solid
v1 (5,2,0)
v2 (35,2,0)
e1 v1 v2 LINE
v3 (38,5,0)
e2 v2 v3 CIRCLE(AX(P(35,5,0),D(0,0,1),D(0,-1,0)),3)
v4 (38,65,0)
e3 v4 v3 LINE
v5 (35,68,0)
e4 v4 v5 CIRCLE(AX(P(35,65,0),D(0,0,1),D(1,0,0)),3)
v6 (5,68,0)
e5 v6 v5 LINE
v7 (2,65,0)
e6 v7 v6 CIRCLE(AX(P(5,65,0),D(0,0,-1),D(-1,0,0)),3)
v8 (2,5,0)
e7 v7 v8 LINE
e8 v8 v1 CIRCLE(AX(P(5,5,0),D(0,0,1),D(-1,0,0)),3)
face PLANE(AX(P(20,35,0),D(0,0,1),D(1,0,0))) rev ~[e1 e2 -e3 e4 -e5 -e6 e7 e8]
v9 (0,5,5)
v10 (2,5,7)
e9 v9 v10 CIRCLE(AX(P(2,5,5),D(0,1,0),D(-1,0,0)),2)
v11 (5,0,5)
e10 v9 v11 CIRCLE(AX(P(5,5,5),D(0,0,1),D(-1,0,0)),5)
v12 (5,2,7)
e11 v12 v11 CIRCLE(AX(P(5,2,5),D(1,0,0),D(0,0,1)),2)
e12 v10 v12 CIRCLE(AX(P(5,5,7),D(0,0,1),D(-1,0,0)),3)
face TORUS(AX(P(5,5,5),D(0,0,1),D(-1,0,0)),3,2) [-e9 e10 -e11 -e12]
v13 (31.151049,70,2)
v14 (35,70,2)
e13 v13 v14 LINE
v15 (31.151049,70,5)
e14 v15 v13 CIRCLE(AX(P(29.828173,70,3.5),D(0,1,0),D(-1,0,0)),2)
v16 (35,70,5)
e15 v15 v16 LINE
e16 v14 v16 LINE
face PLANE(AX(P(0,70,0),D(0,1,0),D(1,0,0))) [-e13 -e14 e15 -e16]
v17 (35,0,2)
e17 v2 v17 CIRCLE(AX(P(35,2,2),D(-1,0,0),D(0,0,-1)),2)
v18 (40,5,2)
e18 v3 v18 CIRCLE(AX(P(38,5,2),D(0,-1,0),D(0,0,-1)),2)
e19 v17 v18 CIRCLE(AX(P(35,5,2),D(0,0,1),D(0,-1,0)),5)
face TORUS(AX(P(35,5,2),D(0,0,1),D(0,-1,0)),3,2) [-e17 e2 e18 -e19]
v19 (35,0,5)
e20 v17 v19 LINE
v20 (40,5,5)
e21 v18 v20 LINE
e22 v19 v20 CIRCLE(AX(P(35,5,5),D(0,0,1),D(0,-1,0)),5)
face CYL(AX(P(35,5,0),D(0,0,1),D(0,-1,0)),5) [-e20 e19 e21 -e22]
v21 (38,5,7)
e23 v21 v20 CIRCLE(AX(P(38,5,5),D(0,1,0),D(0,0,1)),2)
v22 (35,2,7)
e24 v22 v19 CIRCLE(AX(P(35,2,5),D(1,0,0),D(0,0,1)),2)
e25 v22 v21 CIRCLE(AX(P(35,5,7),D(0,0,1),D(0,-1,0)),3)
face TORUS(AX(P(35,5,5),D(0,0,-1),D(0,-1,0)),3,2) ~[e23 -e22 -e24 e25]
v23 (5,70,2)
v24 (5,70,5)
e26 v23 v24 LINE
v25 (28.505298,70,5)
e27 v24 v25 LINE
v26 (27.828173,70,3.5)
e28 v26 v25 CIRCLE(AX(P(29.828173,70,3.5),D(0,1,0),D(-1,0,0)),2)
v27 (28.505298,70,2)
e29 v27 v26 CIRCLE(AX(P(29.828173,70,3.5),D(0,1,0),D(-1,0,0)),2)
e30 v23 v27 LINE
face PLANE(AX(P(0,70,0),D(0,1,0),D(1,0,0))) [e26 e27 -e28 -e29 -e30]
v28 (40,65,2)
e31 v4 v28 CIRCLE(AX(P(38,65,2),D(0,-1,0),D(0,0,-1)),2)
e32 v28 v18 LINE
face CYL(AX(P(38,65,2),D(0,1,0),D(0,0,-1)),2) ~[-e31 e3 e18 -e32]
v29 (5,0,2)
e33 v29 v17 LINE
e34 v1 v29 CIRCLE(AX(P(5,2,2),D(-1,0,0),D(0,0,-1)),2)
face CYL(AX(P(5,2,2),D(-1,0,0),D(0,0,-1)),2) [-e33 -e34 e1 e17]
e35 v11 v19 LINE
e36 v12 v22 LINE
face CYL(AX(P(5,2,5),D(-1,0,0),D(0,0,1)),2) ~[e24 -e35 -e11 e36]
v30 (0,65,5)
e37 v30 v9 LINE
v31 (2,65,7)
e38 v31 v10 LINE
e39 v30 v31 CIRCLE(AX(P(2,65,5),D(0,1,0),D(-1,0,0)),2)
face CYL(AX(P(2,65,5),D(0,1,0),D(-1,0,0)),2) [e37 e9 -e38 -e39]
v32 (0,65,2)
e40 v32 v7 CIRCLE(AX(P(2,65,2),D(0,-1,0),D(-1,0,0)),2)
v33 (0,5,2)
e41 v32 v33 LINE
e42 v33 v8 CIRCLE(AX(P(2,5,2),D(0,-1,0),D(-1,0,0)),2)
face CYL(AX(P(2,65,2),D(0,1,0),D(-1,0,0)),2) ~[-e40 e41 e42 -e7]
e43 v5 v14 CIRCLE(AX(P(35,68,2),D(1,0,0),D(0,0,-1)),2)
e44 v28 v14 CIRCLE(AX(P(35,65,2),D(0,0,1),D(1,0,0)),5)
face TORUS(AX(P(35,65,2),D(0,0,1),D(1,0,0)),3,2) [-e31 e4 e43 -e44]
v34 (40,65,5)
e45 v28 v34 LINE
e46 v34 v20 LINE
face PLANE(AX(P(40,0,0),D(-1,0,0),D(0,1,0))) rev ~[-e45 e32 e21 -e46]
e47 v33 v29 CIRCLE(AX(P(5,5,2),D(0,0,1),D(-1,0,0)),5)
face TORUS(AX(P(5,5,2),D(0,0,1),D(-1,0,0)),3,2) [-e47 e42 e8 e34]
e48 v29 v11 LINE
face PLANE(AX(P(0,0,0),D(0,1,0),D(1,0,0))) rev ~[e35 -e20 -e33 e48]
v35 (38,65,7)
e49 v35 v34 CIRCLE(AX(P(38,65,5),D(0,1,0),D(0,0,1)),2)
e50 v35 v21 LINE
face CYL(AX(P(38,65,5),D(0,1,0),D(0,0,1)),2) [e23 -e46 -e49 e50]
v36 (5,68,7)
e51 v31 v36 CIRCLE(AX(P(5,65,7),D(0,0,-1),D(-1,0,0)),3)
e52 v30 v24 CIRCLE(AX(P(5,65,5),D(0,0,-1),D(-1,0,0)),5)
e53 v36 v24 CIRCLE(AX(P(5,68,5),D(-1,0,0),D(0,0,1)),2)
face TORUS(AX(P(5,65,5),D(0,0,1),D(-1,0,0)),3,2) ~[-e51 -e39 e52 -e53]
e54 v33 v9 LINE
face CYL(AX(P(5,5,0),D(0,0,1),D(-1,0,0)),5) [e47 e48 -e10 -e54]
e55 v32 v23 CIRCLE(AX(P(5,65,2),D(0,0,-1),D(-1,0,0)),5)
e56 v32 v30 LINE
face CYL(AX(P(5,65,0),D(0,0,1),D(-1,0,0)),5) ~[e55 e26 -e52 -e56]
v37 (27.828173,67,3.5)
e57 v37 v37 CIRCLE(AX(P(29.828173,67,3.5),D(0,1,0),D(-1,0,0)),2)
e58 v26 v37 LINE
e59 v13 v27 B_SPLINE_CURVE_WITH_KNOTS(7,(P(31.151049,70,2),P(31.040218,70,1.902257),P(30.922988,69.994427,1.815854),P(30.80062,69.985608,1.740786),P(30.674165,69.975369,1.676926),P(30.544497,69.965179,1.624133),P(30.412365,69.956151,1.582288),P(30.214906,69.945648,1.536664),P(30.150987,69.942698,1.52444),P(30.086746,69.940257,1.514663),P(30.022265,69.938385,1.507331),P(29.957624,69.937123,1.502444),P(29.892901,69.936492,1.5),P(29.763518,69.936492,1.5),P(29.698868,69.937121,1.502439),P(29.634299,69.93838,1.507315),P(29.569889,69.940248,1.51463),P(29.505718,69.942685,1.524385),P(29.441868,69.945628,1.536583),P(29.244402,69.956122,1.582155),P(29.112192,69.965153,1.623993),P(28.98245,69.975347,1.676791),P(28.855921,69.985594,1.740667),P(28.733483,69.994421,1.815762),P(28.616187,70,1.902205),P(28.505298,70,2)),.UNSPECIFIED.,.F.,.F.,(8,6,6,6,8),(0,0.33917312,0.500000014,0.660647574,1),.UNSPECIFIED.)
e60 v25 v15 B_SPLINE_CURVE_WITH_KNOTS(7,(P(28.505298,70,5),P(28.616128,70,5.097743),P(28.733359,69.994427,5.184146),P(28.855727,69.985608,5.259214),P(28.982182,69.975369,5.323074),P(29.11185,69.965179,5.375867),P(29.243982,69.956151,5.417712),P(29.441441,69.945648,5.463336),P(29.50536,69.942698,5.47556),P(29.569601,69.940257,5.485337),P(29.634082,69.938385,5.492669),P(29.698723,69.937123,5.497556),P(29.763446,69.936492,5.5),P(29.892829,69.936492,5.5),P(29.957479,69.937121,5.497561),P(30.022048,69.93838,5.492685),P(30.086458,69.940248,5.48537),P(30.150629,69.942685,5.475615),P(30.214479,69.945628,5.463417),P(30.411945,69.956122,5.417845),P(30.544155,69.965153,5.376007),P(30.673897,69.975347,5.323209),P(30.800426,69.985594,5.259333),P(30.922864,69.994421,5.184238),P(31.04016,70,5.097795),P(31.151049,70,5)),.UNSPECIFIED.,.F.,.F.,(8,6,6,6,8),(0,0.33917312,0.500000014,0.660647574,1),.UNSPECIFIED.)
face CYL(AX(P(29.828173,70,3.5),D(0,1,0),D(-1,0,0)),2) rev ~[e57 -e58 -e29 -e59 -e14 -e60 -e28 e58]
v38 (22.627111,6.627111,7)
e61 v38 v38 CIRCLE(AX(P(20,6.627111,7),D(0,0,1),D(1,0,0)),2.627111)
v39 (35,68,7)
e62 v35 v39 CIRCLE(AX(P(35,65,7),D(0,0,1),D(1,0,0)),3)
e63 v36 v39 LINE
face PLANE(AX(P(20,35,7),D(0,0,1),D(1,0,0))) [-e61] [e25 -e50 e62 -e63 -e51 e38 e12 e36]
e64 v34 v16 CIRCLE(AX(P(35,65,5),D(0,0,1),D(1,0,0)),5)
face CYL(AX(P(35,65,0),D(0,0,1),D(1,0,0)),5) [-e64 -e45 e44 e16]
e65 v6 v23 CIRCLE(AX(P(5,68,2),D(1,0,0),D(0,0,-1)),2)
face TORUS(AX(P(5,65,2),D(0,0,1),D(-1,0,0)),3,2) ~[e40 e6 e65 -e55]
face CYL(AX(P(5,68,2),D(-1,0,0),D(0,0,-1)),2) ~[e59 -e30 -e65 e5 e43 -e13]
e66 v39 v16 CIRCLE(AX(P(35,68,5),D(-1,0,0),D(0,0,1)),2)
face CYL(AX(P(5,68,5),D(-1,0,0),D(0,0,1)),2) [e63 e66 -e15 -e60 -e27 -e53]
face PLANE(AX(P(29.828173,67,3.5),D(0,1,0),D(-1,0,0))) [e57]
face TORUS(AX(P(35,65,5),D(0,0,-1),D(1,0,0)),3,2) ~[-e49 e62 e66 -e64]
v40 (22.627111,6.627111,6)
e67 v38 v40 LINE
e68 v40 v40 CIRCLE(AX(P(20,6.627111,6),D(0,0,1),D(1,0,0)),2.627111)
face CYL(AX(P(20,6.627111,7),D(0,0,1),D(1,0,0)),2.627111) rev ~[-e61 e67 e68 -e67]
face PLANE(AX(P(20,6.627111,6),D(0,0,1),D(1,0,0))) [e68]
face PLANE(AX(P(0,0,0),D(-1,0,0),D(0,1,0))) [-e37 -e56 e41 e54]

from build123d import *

# Parameters (mm, degrees)
F0_W         = 40
F0_H         = 70
F1_DEPTH     = 7
F2_R         = 5
F3_R         = 2
F4_DEPTH     = 3
F5_T1_DEPTH  = 60
F5_T3_DEPTH  = 30
F5_T6_ANGLE  = 90
F5_T8_ANGLE  = 90
F5_T10_ANGLE = 90
F5_T12_ANGLE = 90
F5_T14_ANGLE = 90
F5_T16_ANGLE = 90
F5_T18_ANGLE = 90
F5_T20_ANGLE = 90
F6_R         = 2.6271107644
F7_DEPTH     = 1


# Not quite as in the source:
# - a fillet or chamfer that OpenCascade refuses, or shapes differently, is made with other operations: its cross-section is extruded or revolved along the edge and cut away or added


with BuildPart() as f1:
    # F0 (on Top) → F1 (new body)
    with BuildSketch(Plane.XY):
        with Locations((20, 35)):
            Rectangle(F0_W, F0_H)
    extrude(amount=F1_DEPTH)

    # F2
    f2_edges = [f1.edges().sort_by_distance(p)[0] for p in [
        (40, 70, 3.5),
        (0, 70, 3.5),
        (40, 0, 3.5),
        (0, 0, 3.5),
    ]]
    fillet(f2_edges, radius=F2_R)

    # F3 (on face) → F4 (cut)
    with BuildSketch(Plane(origin=(0, 70, 0), x_dir=(-1, 0, 0), z_dir=(0, 1, 0))):
        with Locations((-29.8281734893, 3.5)):
            Circle(F3_R)
    extrude(amount=-F4_DEPTH, mode=Mode.SUBTRACT)

    # F5: fillet of radius 2 on 16 edges, made by hand

    # F5_s2 → F5_t1 (cut)
    with BuildSketch(Plane.XZ.offset(-65)):
        with BuildLine():
            ThreePointArc((0, 5), (0.5857864376, 6.4142135624), (2, 7))
            Line((2, 7), (0, 7))
            Line((0, 7), (0, 5))
        make_face()
        with BuildLine():
            ThreePointArc((0, 2), (0.5857864376, 0.5857864376), (2, 0))
            Line((2, 0), (0, 0))
            Line((0, 0), (0, 2))
        make_face()
        with BuildLine():
            ThreePointArc((38, 0), (39.4142135624, 0.5857864376), (40, 2))
            Line((40, 2), (40, 0))
            Line((40, 0), (38, 0))
        make_face()
        with BuildLine():
            ThreePointArc((38, 7), (39.4142135624, 6.4142135624), (40, 5))
            Line((40, 5), (40, 7))
            Line((40, 7), (38, 7))
        make_face()
    extrude(amount=F5_T1_DEPTH, mode=Mode.SUBTRACT)

    # F5_s4 → F5_t3 (cut)
    with BuildSketch(Plane.YZ.offset(5)):
        with BuildLine():
            ThreePointArc((68, 0), (69.4142135624, 0.5857864376), (70, 2))
            Line((70, 2), (70, 0))
            Line((70, 0), (68, 0))
        make_face()
        with BuildLine():
            ThreePointArc((2, 0), (0.5857864376, 0.5857864376), (0, 2))
            Line((0, 2), (0, 0))
            Line((0, 0), (2, 0))
        make_face()
        with BuildLine():
            ThreePointArc((68, 7), (69.4142135624, 6.4142135624), (70, 5))
            Line((70, 5), (70, 7))
            Line((70, 7), (68, 7))
        make_face()
        with BuildLine():
            ThreePointArc((2, 7), (0.5857864376, 6.4142135624), (0, 5))
            Line((0, 5), (0, 7))
            Line((0, 7), (2, 7))
        make_face()
    extrude(amount=F5_T3_DEPTH, mode=Mode.SUBTRACT)

    # F5_s5 → F5_t6 (revolve, cut)
    with BuildSketch(Plane.XZ.offset(-65)):
        with BuildLine():
            ThreePointArc((2, 0), (0.5857864376, 0.5857864376), (0, 2))
            Line((0, 2), (0, 0))
            Line((0, 0), (2, 0))
        make_face()
    revolve(axis=Axis((5, 65, 0), (0, 0, -1)), revolution_arc=F5_T6_ANGLE, mode=Mode.SUBTRACT)

    # F5_s7 → F5_t8 (revolve, cut)
    with BuildSketch(Plane.XZ.offset(-5)):
        with BuildLine():
            ThreePointArc((2, 0), (0.5857864376, 0.5857864376), (0, 2))
            Line((0, 2), (0, 0))
            Line((0, 0), (2, 0))
        make_face()
    revolve(axis=Axis((5, 5, 0), (0, 0, 1)), revolution_arc=F5_T8_ANGLE, mode=Mode.SUBTRACT)

    # F5_s9 → F5_t10 (revolve, cut)
    with BuildSketch(Plane.XZ.offset(-65)):
        with BuildLine():
            ThreePointArc((38, 0), (39.4142135624, 0.5857864376), (40, 2))
            Line((40, 2), (40, 0))
            Line((40, 0), (38, 0))
        make_face()
    revolve(axis=Axis((35, 65, 0), (0, 0, 1)), revolution_arc=F5_T10_ANGLE, mode=Mode.SUBTRACT)

    # F5_s11 → F5_t12 (revolve, cut)
    with BuildSketch(Plane.YZ.offset(35)):
        with BuildLine():
            ThreePointArc((2, 0), (0.5857864376, 0.5857864376), (0, 2))
            Line((0, 2), (0, 0))
            Line((0, 0), (2, 0))
        make_face()
    revolve(axis=Axis((35, 5, 0), (0, 0, 1)), revolution_arc=F5_T12_ANGLE, mode=Mode.SUBTRACT)

    # F5_s13 → F5_t14 (revolve, cut)
    with BuildSketch(Plane.XZ.offset(-65)):
        with BuildLine():
            ThreePointArc((0, 5), (0.5857864376, 6.4142135624), (2, 7))
            Line((2, 7), (0, 7))
            Line((0, 7), (0, 5))
        make_face()
    revolve(axis=Axis((5, 65, 7), (0, 0, -1)), revolution_arc=F5_T14_ANGLE, mode=Mode.SUBTRACT)

    # F5_s15 → F5_t16 (revolve, cut)
    with BuildSketch(Plane.XZ.offset(-5)):
        with BuildLine():
            ThreePointArc((0, 5), (0.5857864376, 6.4142135624), (2, 7))
            Line((2, 7), (0, 7))
            Line((0, 7), (0, 5))
        make_face()
    revolve(axis=Axis((5, 5, 7), (0, 0, 1)), revolution_arc=F5_T16_ANGLE, mode=Mode.SUBTRACT)

    # F5_s17 → F5_t18 (revolve, cut)
    with BuildSketch(Plane.XZ.offset(-65)):
        with BuildLine():
            ThreePointArc((38, 7), (39.4142135624, 6.4142135624), (40, 5))
            Line((40, 5), (40, 7))
            Line((40, 7), (38, 7))
        make_face()
    revolve(axis=Axis((35, 65, 7), (0, 0, 1)), revolution_arc=F5_T18_ANGLE, mode=Mode.SUBTRACT)

    # F5_s19 → F5_t20 (revolve, cut)
    with BuildSketch(Plane.YZ.offset(35)):
        with BuildLine():
            ThreePointArc((2, 7), (0.5857864376, 6.4142135624), (0, 5))
            Line((0, 5), (0, 7))
            Line((0, 7), (2, 7))
        make_face()
    revolve(axis=Axis((35, 5, 7), (0, 0, 1)), revolution_arc=F5_T20_ANGLE, mode=Mode.SUBTRACT)

    # F6 (on face) → F7 (cut)
    with BuildSketch(Plane.XY.offset(7)):
        with Locations((20, 6.6271107644)):
            Circle(F6_R)
    extrude(amount=-F7_DEPTH, mode=Mode.SUBTRACT)


solid = f1.part
